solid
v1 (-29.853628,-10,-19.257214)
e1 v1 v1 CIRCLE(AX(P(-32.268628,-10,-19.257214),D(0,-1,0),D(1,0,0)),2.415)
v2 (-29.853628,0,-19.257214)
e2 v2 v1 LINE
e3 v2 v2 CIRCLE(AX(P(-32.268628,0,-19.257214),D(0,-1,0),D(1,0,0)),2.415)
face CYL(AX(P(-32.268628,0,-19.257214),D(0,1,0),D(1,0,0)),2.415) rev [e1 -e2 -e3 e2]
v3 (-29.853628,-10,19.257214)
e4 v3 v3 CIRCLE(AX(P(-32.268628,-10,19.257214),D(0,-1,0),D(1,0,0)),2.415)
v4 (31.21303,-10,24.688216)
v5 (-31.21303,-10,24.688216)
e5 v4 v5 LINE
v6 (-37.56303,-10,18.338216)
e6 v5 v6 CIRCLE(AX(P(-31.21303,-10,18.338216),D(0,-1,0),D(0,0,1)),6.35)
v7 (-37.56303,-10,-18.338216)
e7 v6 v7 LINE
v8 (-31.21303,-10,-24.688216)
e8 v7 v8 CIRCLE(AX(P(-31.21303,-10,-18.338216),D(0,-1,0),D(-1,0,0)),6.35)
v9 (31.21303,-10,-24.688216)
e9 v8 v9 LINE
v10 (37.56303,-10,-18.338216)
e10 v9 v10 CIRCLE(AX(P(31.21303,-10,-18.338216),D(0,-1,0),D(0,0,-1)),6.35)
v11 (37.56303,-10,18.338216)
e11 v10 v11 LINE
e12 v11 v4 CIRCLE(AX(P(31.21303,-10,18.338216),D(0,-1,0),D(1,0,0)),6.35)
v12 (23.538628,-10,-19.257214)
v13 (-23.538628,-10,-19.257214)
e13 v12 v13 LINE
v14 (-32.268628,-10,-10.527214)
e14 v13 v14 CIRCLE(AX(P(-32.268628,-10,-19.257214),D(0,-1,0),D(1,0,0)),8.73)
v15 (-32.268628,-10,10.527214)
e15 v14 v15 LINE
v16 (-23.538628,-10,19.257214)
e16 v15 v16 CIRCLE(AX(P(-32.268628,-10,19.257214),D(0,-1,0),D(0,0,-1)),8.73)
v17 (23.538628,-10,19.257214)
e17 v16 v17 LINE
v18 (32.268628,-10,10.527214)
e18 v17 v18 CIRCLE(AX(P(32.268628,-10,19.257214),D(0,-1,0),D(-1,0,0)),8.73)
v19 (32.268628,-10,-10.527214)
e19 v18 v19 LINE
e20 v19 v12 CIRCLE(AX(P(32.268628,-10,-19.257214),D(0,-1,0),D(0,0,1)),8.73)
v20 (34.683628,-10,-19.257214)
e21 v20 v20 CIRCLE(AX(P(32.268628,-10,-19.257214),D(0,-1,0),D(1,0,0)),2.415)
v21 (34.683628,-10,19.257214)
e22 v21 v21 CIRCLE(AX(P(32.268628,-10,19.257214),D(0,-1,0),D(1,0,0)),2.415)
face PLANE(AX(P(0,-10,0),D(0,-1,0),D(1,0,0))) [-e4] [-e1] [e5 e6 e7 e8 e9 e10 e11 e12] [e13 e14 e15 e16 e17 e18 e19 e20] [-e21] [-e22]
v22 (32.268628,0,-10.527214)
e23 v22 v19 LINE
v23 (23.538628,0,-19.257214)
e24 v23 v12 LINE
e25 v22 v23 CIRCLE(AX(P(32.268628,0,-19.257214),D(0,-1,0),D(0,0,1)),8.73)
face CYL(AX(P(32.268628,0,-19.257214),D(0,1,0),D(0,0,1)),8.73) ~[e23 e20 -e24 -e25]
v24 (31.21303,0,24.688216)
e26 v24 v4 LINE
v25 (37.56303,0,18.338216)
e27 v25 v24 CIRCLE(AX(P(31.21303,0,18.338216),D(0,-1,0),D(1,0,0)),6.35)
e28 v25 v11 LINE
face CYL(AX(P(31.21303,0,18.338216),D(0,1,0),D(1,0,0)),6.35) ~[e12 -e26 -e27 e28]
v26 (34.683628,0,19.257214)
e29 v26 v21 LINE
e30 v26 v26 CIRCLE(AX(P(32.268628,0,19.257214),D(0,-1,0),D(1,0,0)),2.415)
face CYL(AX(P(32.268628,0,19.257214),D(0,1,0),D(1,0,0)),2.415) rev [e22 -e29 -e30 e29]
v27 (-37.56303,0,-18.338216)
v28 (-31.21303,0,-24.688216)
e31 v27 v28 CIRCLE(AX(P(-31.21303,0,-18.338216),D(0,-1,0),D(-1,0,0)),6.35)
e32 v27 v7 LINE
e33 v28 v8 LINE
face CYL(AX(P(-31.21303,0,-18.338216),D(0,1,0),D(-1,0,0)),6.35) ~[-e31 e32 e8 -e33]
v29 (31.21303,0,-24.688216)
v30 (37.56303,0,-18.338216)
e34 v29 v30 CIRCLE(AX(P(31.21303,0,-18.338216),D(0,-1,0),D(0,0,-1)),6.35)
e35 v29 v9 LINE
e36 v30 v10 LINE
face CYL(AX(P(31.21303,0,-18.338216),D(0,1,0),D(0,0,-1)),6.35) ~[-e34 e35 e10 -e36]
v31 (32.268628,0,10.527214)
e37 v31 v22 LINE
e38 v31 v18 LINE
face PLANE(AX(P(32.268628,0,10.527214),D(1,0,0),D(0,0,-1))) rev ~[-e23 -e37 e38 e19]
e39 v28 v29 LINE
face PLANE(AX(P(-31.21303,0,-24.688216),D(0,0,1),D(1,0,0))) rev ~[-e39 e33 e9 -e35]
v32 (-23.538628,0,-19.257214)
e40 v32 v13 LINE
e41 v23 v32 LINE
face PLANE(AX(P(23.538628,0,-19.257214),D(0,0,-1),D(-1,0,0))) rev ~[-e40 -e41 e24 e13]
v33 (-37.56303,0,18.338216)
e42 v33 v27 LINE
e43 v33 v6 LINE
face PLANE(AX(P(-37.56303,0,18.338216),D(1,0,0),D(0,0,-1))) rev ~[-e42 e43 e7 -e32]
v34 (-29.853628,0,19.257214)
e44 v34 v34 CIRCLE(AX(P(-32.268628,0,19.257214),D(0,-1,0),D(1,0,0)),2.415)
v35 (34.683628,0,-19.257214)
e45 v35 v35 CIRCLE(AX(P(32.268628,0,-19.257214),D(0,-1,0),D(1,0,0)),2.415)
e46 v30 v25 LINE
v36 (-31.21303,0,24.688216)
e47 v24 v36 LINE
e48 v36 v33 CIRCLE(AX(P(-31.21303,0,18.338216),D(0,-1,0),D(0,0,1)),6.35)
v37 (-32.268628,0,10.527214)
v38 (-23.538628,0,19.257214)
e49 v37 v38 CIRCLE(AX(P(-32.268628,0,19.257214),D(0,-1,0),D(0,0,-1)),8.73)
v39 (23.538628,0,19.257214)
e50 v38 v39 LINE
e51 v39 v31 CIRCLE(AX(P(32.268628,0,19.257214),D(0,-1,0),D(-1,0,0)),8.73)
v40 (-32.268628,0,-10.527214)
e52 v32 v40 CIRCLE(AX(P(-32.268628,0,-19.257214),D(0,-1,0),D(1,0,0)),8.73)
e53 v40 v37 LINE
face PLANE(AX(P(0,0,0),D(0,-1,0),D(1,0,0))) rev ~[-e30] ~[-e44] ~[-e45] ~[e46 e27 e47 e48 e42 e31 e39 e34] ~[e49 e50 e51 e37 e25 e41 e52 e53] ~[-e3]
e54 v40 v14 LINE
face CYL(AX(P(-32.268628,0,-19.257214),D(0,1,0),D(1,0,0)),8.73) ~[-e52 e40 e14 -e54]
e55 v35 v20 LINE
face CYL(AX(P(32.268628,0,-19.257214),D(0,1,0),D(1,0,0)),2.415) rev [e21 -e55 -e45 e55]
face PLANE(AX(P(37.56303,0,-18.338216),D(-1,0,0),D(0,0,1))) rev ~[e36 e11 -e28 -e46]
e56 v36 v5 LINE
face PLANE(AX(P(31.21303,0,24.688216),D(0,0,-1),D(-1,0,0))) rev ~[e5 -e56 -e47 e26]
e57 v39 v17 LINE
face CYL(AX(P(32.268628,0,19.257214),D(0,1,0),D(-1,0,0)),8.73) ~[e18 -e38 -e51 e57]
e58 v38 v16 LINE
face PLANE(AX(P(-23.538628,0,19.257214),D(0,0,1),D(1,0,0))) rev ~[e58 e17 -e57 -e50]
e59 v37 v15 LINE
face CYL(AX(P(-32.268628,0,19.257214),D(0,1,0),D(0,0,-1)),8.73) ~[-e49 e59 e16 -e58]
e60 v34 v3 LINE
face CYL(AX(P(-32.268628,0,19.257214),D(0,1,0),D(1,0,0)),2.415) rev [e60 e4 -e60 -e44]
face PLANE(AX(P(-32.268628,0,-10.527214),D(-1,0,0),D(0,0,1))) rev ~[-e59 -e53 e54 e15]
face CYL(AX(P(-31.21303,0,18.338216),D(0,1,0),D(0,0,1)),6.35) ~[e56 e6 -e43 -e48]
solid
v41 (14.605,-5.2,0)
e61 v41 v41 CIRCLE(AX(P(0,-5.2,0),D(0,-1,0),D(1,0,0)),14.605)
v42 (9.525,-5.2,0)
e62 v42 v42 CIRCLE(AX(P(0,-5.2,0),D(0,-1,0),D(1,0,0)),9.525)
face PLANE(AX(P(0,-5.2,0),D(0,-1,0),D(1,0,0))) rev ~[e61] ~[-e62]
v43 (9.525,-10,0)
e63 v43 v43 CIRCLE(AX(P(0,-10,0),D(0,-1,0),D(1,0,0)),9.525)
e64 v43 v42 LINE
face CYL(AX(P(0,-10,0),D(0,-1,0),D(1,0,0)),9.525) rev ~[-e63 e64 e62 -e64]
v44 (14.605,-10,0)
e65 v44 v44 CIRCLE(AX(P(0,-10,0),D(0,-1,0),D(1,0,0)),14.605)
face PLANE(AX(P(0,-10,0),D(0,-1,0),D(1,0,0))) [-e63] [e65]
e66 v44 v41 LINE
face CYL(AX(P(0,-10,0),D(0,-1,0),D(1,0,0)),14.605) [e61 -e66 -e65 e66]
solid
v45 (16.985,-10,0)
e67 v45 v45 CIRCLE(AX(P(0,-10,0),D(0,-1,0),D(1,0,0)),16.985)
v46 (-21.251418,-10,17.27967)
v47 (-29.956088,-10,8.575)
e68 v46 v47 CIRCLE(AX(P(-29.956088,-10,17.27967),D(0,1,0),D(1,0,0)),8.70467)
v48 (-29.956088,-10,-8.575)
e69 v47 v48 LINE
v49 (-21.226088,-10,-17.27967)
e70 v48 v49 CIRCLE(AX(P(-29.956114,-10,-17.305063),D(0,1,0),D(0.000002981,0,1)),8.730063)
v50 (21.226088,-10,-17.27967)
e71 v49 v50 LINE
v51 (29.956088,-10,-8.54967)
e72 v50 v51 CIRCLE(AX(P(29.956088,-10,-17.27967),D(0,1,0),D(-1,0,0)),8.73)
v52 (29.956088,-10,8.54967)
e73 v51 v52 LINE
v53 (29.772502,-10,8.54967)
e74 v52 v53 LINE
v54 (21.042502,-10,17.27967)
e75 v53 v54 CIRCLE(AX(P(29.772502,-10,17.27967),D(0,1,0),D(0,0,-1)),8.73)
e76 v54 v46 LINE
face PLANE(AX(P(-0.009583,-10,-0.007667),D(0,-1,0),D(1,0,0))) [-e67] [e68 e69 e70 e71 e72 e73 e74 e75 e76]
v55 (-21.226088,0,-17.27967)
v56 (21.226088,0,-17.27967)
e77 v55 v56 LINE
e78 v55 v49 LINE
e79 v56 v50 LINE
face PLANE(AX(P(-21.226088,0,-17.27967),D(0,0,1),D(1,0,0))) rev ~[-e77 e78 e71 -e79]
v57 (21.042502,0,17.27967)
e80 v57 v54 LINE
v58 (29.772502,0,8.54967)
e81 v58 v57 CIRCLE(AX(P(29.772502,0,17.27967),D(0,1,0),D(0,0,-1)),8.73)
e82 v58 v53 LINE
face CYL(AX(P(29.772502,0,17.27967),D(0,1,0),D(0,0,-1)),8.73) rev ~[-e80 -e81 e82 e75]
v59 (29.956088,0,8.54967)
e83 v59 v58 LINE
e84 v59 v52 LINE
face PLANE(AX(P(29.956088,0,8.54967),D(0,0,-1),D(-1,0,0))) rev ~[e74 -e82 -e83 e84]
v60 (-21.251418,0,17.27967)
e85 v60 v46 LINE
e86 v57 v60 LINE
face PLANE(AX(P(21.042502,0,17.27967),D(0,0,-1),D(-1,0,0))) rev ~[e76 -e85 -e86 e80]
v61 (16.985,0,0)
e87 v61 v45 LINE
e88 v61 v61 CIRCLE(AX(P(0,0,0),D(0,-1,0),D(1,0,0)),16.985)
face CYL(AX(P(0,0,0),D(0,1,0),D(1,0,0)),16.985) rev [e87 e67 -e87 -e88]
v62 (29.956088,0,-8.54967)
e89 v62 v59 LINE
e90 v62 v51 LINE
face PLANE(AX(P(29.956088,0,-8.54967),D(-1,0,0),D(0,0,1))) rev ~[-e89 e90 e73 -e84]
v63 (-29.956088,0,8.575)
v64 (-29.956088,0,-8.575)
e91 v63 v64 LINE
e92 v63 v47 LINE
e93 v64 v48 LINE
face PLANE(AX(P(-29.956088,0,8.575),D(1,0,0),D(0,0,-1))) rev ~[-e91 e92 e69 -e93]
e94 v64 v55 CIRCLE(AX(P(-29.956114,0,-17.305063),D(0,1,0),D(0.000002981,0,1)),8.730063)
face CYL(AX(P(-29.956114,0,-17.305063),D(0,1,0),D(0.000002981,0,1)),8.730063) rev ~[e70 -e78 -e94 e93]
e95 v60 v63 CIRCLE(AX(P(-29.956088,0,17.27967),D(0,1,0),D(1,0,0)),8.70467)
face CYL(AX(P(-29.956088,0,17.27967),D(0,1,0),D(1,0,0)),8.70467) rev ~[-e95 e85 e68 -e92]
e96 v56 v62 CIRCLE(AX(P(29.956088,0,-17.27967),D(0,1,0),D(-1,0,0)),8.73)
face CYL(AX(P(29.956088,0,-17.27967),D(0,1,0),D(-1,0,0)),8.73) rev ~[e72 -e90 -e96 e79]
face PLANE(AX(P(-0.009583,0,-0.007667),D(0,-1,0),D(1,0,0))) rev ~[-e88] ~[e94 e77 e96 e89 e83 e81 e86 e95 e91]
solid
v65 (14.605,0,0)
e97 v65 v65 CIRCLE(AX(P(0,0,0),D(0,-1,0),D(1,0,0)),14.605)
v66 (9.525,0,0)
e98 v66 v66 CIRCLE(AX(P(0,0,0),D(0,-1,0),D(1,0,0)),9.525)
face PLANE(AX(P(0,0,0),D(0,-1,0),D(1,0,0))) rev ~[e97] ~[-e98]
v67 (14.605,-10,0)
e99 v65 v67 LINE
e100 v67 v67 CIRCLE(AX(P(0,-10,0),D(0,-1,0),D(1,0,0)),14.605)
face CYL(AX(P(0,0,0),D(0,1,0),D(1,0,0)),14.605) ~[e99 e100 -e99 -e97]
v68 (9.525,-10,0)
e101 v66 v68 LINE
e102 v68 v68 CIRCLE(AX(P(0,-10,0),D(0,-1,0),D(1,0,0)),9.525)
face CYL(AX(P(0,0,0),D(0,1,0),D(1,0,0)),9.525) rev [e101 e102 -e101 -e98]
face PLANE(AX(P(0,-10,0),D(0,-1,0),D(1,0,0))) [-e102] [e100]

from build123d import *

# Parameters (mm, degrees)
F0_R     = 16.985
F1_DEPTH = 10
F0_R_2   = 14.605
F0_R_3   = 9.525
F2_DEPTH = 4.8
F0_R_4   = 2.415
F3_DEPTH = 10


# Not quite as in the source:
# - ends of sketch curves that miss each other by under 0.0002 mm in the source are joined


with BuildPart() as f1:
    # F0 (on Front) → F1 (new body)
    with BuildSketch(Plane.XZ):
        with BuildLine():
            Line((-21.2260876428, -17.2796698886), (21.2260876428, -17.2796698886))
            ThreePointArc((21.2260876428, -17.2796698886), (23.783045443, -11.1066276889), (29.9560876428, -8.5496698886))
            Line((29.9560876428, -8.5496698886), (29.9560876428, 8.5496698886))
            Line((29.9560876428, 8.5496698886), (29.7725021094, 8.5496698886))
            ThreePointArc((29.7725021094, 8.5496698886), (23.5994599096, 11.1066276889), (21.0425021094, 17.2796698886))
            Line((21.0425021094, 17.2796698886), (-21.2514177542, 17.2796698886))
            ThreePointArc((-21.2514177542, 17.2796698886), (-23.8009565366, 11.1245387824), (-29.9560876428, 8.575))
            Line((-29.9560876428, 8.575), (-29.9560876428, -8.575))
            ThreePointArc((-29.9560876428, -8.575), (-23.7920074576, -11.1230087778), (-21.2260876428, -17.2796698886))
        make_face()
        Circle(F0_R, mode=Mode.SUBTRACT)
    extrude(amount=F1_DEPTH)


with BuildPart() as f1b:
    # F0 (on Front) → F1, piece 2 (new body)
    with BuildSketch(Plane.XZ):
        Circle(F0_R_2)
        Circle(F0_R_3, mode=Mode.SUBTRACT)
    extrude(amount=F1_DEPTH)


with BuildPart() as f2:
    # F2 (new): a face of the model
    f2_faces = [f1b.part.faces().sort_by_distance(p)[0] for p in [
        (-14.1919082184, -10, 0),
    ]]
    extrude(f2_faces, amount=-F2_DEPTH)


with BuildPart() as f3:
    # F0 (on Front) → F3 (new body)
    with BuildSketch(Plane.XZ):
        with BuildLine():
            Line((31.2130296767, 24.6882159263), (-31.2130296767, 24.6882159263))
            ThreePointArc((-31.2130296767, 24.6882159263), (-35.7031577372, 22.8283439868), (-37.5630296767, 18.3382159263))
            Line((-37.5630296767, 18.3382159263), (-37.5630296767, -18.3382159263))
            ThreePointArc((-37.5630296767, -18.3382159263), (-35.7031577372, -22.8283439868), (-31.2130296767, -24.6882159263))
            Line((-31.2130296767, -24.6882159263), (31.2130296767, -24.6882159263))
            ThreePointArc((31.2130296767, -24.6882159263), (35.7031577372, -22.8283439868), (37.5630296767, -18.3382159263))
            Line((37.5630296767, -18.3382159263), (37.5630296767, 18.3382159263))
            ThreePointArc((37.5630296767, 18.3382159263), (35.7031577372, 22.8283439868), (31.2130296767, 24.6882159263))
        make_face()
        with Locations((-32.2686284781, -19.2572141065)):
            Circle(F0_R_4, mode=Mode.SUBTRACT)
        with Locations((32.2686284781, -19.2572141065)):
            Circle(F0_R_4, mode=Mode.SUBTRACT)
        with Locations((-32.2686284781, 19.2572141065)):
            Circle(F0_R_4, mode=Mode.SUBTRACT)
        with BuildLine():
            ThreePointArc((32.2686284781, -10.5272141065), (26.0955862783, -13.0841719068), (23.5386284781, -19.2572141065))
            Line((23.5386284781, -19.2572141065), (-23.5386284781, -19.2572141065))
            ThreePointArc((-23.5386284781, -19.2572141065), (-26.0955862783, -13.0841719068), (-32.2686284781, -10.5272141065))
            Line((-32.2686284781, -10.5272141065), (-32.2686284781, 10.5272141065))
            ThreePointArc((-32.2686284781, 10.5272141065), (-26.0955862783, 13.0841719068), (-23.5386284781, 19.2572141065))
            Line((-23.5386284781, 19.2572141065), (23.5386284781, 19.2572141065))
            ThreePointArc((23.5386284781, 19.2572141065), (26.0955862783, 13.0841719068), (32.2686284781, 10.5272141065))
            Line((32.2686284781, 10.5272141065), (32.2686284781, -10.5272141065))
        make_face(mode=Mode.SUBTRACT)
        with Locations((32.2686284781, 19.2572141065)):
            Circle(F0_R_4, mode=Mode.SUBTRACT)
    extrude(amount=F3_DEPTH)


solid = Compound([f1.part, f1b.part, f2.part, f3.part])
